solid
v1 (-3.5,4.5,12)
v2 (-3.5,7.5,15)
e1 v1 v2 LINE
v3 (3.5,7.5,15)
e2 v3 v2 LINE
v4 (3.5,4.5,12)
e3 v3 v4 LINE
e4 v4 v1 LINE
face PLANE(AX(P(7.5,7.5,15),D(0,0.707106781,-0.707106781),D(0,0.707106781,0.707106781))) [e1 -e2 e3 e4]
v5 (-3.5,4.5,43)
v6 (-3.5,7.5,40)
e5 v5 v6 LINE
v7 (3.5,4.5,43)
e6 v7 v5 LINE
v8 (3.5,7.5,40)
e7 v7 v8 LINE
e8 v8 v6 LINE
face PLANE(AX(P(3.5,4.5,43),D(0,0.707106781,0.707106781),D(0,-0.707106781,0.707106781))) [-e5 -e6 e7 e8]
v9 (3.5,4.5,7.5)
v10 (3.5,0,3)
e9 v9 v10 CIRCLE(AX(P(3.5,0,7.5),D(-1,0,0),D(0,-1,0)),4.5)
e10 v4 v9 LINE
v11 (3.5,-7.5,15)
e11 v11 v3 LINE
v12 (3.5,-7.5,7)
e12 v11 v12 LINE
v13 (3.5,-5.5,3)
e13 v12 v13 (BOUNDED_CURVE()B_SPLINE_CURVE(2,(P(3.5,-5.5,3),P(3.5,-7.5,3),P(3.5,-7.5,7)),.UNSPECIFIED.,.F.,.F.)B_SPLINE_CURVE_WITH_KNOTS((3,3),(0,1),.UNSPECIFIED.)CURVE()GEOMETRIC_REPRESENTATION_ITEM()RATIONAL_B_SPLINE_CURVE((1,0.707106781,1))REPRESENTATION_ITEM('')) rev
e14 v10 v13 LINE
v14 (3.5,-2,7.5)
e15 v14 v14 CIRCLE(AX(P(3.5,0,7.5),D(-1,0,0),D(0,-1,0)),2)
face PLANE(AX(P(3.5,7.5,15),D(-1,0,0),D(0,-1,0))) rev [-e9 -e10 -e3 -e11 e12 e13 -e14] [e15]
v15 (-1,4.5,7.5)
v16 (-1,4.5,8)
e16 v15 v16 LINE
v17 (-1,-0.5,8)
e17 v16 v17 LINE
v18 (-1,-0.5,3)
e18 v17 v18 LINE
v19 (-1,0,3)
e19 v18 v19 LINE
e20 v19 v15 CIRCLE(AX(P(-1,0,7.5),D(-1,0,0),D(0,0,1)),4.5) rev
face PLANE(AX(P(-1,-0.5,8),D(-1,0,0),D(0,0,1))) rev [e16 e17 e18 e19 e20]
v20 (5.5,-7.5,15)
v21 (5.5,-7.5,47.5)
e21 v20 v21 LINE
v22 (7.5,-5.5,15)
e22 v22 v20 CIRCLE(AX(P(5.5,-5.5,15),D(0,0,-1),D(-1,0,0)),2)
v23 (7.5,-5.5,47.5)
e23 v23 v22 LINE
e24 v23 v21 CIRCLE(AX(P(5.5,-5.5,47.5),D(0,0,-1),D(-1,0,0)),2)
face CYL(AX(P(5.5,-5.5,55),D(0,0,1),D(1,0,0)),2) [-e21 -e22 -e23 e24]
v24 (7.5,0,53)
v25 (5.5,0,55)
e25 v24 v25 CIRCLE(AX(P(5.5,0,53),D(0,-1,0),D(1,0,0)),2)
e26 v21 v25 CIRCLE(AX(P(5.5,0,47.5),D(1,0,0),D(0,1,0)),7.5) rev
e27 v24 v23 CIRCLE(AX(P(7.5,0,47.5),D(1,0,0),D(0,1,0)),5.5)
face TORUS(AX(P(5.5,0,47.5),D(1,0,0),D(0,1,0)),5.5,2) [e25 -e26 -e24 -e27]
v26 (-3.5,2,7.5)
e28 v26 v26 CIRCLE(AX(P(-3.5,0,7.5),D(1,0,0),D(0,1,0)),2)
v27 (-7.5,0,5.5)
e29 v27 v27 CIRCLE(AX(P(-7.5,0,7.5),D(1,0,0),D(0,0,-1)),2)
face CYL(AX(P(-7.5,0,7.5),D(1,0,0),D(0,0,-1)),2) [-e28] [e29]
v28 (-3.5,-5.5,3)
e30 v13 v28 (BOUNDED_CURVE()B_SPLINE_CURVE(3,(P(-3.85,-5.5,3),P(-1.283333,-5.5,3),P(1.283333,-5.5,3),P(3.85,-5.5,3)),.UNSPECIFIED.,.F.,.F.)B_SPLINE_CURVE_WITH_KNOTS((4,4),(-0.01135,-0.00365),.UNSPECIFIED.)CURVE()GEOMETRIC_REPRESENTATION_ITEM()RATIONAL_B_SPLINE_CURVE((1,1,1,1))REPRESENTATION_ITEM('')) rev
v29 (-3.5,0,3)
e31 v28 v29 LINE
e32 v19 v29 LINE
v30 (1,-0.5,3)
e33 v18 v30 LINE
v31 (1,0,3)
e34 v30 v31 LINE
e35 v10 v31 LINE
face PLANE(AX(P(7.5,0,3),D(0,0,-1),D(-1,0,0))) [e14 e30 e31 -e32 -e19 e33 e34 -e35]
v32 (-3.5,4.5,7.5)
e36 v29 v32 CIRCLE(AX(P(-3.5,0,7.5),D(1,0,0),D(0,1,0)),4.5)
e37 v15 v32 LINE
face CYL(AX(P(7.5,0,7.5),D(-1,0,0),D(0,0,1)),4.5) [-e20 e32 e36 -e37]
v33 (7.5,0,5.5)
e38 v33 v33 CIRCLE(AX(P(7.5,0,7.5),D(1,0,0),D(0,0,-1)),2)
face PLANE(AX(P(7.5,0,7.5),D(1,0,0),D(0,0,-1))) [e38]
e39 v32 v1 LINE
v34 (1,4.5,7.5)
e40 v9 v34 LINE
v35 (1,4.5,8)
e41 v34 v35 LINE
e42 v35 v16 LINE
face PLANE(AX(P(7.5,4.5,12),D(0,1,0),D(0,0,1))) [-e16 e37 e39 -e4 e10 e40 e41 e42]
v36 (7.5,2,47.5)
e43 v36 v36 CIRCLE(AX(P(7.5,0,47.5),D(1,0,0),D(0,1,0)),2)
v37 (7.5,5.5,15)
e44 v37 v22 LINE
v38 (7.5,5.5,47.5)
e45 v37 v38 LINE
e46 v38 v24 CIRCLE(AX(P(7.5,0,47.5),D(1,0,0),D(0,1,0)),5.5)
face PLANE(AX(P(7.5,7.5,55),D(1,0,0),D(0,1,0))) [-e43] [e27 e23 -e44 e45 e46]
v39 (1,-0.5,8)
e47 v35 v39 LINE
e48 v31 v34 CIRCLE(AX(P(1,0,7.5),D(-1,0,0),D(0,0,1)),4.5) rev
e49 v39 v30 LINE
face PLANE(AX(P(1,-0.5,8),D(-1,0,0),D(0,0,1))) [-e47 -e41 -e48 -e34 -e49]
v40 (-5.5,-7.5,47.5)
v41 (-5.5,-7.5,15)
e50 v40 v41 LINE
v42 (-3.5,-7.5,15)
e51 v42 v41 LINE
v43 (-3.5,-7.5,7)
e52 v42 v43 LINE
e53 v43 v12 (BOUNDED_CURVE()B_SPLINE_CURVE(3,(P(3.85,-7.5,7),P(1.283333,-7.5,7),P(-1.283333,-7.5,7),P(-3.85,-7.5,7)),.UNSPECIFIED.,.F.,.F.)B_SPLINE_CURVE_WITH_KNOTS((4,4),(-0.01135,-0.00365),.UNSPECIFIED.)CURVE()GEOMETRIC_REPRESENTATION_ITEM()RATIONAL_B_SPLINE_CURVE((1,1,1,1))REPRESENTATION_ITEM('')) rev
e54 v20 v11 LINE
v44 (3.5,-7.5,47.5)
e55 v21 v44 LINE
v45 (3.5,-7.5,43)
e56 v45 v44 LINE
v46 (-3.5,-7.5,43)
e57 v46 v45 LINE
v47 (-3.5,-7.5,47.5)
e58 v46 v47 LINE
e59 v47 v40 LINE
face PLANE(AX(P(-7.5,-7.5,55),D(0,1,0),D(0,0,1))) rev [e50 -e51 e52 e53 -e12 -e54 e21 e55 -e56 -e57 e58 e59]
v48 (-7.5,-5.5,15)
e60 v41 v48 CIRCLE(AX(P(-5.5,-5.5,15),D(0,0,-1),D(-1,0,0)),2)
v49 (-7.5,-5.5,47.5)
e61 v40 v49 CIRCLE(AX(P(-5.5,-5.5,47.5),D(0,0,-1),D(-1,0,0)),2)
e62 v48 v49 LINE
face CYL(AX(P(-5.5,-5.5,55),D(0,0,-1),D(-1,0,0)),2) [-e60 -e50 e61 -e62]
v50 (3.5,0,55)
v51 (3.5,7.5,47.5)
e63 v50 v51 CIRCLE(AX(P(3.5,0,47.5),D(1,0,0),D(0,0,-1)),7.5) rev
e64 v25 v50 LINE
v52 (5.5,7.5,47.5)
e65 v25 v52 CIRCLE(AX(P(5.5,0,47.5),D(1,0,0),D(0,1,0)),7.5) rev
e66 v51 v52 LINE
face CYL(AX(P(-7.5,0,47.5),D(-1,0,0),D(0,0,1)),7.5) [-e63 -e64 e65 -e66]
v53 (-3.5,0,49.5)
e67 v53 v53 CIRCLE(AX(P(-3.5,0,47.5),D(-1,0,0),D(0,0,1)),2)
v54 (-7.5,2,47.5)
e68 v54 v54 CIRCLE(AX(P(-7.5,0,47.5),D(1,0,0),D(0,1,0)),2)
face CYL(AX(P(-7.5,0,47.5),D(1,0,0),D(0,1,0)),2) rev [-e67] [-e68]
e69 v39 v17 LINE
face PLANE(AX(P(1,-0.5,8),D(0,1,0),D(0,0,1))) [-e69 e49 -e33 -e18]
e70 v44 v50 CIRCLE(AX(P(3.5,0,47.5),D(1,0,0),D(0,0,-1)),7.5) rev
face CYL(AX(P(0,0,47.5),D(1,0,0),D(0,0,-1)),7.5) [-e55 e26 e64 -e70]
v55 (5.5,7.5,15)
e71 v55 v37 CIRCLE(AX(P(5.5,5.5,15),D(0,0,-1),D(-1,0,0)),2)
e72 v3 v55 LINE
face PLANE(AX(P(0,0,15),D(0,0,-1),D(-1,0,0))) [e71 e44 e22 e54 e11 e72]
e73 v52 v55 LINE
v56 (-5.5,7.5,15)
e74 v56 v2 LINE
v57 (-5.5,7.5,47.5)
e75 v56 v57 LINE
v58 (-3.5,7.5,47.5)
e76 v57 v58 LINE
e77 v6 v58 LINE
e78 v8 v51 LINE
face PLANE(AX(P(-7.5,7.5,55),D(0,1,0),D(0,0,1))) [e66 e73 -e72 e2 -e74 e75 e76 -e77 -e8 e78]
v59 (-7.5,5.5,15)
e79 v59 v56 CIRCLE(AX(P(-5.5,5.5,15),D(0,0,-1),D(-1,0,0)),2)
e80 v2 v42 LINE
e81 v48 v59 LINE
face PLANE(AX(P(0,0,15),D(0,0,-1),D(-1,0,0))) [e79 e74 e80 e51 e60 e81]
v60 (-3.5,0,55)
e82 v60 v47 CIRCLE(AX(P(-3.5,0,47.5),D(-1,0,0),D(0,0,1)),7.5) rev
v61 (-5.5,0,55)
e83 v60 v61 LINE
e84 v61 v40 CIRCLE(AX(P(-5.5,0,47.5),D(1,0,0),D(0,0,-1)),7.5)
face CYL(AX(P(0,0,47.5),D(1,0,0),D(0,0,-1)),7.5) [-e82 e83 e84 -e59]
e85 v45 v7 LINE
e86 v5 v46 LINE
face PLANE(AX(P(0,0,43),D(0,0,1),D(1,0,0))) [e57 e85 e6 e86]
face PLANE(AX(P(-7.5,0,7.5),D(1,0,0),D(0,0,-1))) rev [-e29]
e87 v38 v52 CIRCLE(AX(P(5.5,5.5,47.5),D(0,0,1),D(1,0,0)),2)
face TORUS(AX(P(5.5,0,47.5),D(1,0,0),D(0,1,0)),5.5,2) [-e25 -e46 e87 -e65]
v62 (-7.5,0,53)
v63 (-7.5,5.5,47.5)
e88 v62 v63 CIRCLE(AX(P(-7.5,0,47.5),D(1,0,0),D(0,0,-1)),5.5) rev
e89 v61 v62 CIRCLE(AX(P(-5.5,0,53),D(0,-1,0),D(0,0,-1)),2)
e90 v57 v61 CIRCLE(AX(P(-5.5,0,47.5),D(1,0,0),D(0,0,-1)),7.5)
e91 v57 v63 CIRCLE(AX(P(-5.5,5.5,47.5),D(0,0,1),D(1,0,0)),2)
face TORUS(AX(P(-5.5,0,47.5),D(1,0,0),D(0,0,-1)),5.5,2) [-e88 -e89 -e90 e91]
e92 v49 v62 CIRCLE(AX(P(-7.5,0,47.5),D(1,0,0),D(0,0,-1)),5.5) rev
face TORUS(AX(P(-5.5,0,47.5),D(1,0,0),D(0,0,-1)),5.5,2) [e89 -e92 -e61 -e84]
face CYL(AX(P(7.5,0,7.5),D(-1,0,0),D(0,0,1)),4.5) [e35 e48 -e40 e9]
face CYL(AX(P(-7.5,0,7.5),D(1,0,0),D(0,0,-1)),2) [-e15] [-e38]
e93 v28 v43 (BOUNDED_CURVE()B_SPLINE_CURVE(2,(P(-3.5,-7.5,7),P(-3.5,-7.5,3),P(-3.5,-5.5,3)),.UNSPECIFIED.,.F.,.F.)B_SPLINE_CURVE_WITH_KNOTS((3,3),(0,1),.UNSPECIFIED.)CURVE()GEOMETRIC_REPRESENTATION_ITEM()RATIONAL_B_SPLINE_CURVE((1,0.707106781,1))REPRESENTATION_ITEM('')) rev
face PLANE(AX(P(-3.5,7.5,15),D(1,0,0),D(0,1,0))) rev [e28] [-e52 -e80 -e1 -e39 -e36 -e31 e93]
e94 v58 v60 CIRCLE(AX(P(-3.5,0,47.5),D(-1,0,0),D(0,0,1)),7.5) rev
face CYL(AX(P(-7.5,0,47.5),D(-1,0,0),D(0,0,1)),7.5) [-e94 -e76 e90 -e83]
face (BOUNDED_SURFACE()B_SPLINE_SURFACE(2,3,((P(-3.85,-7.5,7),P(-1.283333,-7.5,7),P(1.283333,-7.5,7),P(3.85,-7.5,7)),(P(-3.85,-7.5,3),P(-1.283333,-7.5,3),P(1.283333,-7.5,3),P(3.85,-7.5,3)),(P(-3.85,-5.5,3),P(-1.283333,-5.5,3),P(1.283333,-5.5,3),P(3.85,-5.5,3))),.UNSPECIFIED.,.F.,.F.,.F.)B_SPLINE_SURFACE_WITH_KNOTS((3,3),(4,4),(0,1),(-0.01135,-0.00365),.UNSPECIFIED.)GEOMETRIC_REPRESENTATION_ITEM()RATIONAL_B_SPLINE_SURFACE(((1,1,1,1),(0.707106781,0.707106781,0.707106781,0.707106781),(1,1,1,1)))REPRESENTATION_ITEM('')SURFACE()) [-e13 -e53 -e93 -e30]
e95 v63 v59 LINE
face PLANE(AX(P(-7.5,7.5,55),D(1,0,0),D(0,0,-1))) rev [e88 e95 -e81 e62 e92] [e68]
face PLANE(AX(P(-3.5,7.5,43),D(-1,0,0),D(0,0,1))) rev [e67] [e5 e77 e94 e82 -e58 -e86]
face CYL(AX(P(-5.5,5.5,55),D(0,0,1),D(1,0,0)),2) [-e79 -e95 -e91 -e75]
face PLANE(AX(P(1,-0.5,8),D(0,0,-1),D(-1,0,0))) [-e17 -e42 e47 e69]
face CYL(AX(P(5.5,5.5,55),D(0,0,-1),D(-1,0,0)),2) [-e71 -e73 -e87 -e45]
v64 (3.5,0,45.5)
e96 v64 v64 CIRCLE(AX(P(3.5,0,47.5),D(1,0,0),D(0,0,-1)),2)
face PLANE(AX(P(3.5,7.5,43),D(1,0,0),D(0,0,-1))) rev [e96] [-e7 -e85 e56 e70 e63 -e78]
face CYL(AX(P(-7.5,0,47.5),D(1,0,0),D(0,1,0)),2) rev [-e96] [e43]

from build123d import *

# Parameters (mm, degrees)
SKETCH1_W                = 15
SKETCH1_H                = 15
BOSS_EXTRUDE1_DEPTH      = 55
SKETCH3_W                = 7
SKETCH3_H                = 15
CUT_EXTRUDE1_DEPTH       = 12
SKETCH4_R                = 2
CUT_EXTRUDE2_DEPTH       = 15
SKETCH5_W                = 4
SKETCH5_H                = 15
CUT_EXTRUDE3_DEPTH       = 15
BOSS_EXTRUDE2_DEPTH      = 7.5
BOSS_EXTRUDE2_DEPTH_BACK = 7.5
SKETCH6_R                = 2
FILLET1_R                = 7.5
CUT_EXTRUDE6_DEPTH       = 3.5
CUT_EXTRUDE6_DEPTH_BACK  = 3.5
FILLET2_R                = 2
CUT_EXTRUDE7_DEPTH       = 7.5
CUT_EXTRUDE7_DEPTH_BACK  = 7.5
FILLET3_SIZE             = 4
FILLET3_SIZE_2           = 2
CUT_EXTRUDE8_DEPTH       = 1
CUT_EXTRUDE8_DEPTH_BACK  = 1


# Some blends are built 0.0001 mm under size
with BuildPart() as part:
    # Sketch1 → Boss-Extrude1 (new body)
    with BuildSketch(Plane.XY):
        Rectangle(SKETCH1_W, SKETCH1_H)
    extrude(amount=BOSS_EXTRUDE1_DEPTH)

    # Sketch3 → Cut-Extrude1 (cut)
    with BuildSketch(Plane.XY.offset(55)):
        Rectangle(SKETCH3_W, SKETCH3_H)
    extrude(amount=-CUT_EXTRUDE1_DEPTH, mode=Mode.SUBTRACT)

    # Sketch4 → Cut-Extrude2 (cut)
    with BuildSketch(Plane(origin=(7.5, 0, 0), x_dir=(0, 0, -1), z_dir=(1, 0, 0))):
        with Locations(Location((-47.5, 0, 0), (0, 0, 90))):
            Circle(SKETCH4_R)
    extrude(amount=-CUT_EXTRUDE2_DEPTH, mode=Mode.SUBTRACT)

    # Sketch5 → Cut-Extrude3 (cut)
    with BuildSketch(Plane(origin=(0, 0, 0), x_dir=(-1, 0, 0), z_dir=(0, 0, -1))):
        with Locations((-5.5, 0)):
            Rectangle(SKETCH5_W, SKETCH5_H)
        with Locations((5.5, 0)):
            Rectangle(SKETCH5_W, SKETCH5_H)
    extrude(amount=-CUT_EXTRUDE3_DEPTH, mode=Mode.SUBTRACT)

    # Sketch6 → Boss-Extrude2 (add, two sides: drawn at the far end of the back side and taken through both)
    with BuildSketch(Plane(origin=(0, 0, 0), x_dir=(0, 0, -1), z_dir=(1, 0, 0)).offset(-BOSS_EXTRUDE2_DEPTH_BACK)):
        with Locations((-7.5, 0)):
            Circle(SKETCH6_R)
    extrude(amount=BOSS_EXTRUDE2_DEPTH + BOSS_EXTRUDE2_DEPTH_BACK)

    # Fillet1
    fillet1_edges = [part.edges().sort_by_distance(p)[0] for p in [
        (5.5, -7.5, 55),
        (-5.5, -7.5, 55),
        (-5.5, 7.5, 55),
        (5.5, 7.5, 55),
    ]]
    fillet(fillet1_edges, radius=FILLET1_R - 0.0001)  # a hair under: the kernel refuses the full size

    # Sketch7 → Cut-Extrude6 (cut, two sides: drawn at the far end of the back side and taken through both)
    with BuildSketch(Plane(origin=(0, 0, 0), x_dir=(0, 0, -1), z_dir=(1, 0, 0)).offset(-CUT_EXTRUDE6_DEPTH_BACK)):
        Polygon((-43, 7.5), (-43, 4.5), (-40, 7.5), align=None)
    extrude(amount=CUT_EXTRUDE6_DEPTH + CUT_EXTRUDE6_DEPTH_BACK, mode=Mode.SUBTRACT)

    # Fillet2
    fillet2_edges = [part.edges().sort_by_distance(p)[0] for p in [
        (7.5, -7.5, 31.25005),
        (7.5, 7.5, 31.25005),
        (7.5, 5.303330148, 52.803330148),
        (7.5, -5.303330148, 52.803330148),
        (-7.5, -7.5, 31.25005),
        (-7.5, 7.5, 31.25005),
        (-7.5, 5.303330148, 52.803330148),
        (-7.5, -5.303330148, 52.803330148),
    ]]
    fillet(fillet2_edges, radius=FILLET2_R)

    # Sketch8 → Cut-Extrude7 (cut, two sides: drawn at the far end of the back side and taken through both)
    with BuildSketch(Plane(origin=(0, 0, 0), x_dir=(0, 0, -1), z_dir=(1, 0, 0)).offset(-CUT_EXTRUDE7_DEPTH_BACK)):
        with BuildLine():
            Line((-15, 7.5), (-12, 4.5))
            Line((-12, 4.5), (-7.5, 4.5))
            ThreePointArc((-7.5, 4.5), (-4.318019485, 3.181980515), (-3, 0))
            Line((-3, 0), (-3, -7.5))
            Line((-3, -7.5), (0, -7.5))
            Line((0, -7.5), (0, 7.5))
            Line((0, 7.5), (-15, 7.5))
        make_face()
    extrude(amount=CUT_EXTRUDE7_DEPTH + CUT_EXTRUDE7_DEPTH_BACK, mode=Mode.SUBTRACT)

    # Fillet3
    # an asymmetric fillet: 4, 2 mm, written as the material it takes off along each edge
    with BuildSketch(Plane(origin=(-13.5, -7.5, 3), x_dir=(0, 0, 1), z_dir=(1, 0, 0))) as fillet3_piece_1:
        with BuildLine():
            Bezier((FILLET3_SIZE, 0), (0, 0), (0, -FILLET3_SIZE_2), weights=[1, 0.707106781, 1])
            Line((0, -FILLET3_SIZE_2), (0, 0))
            Line((0, 0), (FILLET3_SIZE, 0))
        make_face()
    extrude(amount=27, mode=Mode.SUBTRACT)

    # Sketch9 → Cut-Extrude8 (cut, two sides: drawn at the far end of the back side and taken through both)
    with BuildSketch(Plane(origin=(0, 0, 0), x_dir=(0, 0, -1), z_dir=(1, 0, 0)).offset(-CUT_EXTRUDE8_DEPTH_BACK)):
        with BuildLine():
            Line((-8, -0.5), (-8, 9.147620524))
            ThreePointArc((-8, 9.147620524), (-1.178102105, 6.321897895), (1.647620524, -0.5))
            Line((1.647620524, -0.5), (-8, -0.5))
        make_face()
    extrude(amount=CUT_EXTRUDE8_DEPTH + CUT_EXTRUDE8_DEPTH_BACK, mode=Mode.SUBTRACT)


solid = part.part
